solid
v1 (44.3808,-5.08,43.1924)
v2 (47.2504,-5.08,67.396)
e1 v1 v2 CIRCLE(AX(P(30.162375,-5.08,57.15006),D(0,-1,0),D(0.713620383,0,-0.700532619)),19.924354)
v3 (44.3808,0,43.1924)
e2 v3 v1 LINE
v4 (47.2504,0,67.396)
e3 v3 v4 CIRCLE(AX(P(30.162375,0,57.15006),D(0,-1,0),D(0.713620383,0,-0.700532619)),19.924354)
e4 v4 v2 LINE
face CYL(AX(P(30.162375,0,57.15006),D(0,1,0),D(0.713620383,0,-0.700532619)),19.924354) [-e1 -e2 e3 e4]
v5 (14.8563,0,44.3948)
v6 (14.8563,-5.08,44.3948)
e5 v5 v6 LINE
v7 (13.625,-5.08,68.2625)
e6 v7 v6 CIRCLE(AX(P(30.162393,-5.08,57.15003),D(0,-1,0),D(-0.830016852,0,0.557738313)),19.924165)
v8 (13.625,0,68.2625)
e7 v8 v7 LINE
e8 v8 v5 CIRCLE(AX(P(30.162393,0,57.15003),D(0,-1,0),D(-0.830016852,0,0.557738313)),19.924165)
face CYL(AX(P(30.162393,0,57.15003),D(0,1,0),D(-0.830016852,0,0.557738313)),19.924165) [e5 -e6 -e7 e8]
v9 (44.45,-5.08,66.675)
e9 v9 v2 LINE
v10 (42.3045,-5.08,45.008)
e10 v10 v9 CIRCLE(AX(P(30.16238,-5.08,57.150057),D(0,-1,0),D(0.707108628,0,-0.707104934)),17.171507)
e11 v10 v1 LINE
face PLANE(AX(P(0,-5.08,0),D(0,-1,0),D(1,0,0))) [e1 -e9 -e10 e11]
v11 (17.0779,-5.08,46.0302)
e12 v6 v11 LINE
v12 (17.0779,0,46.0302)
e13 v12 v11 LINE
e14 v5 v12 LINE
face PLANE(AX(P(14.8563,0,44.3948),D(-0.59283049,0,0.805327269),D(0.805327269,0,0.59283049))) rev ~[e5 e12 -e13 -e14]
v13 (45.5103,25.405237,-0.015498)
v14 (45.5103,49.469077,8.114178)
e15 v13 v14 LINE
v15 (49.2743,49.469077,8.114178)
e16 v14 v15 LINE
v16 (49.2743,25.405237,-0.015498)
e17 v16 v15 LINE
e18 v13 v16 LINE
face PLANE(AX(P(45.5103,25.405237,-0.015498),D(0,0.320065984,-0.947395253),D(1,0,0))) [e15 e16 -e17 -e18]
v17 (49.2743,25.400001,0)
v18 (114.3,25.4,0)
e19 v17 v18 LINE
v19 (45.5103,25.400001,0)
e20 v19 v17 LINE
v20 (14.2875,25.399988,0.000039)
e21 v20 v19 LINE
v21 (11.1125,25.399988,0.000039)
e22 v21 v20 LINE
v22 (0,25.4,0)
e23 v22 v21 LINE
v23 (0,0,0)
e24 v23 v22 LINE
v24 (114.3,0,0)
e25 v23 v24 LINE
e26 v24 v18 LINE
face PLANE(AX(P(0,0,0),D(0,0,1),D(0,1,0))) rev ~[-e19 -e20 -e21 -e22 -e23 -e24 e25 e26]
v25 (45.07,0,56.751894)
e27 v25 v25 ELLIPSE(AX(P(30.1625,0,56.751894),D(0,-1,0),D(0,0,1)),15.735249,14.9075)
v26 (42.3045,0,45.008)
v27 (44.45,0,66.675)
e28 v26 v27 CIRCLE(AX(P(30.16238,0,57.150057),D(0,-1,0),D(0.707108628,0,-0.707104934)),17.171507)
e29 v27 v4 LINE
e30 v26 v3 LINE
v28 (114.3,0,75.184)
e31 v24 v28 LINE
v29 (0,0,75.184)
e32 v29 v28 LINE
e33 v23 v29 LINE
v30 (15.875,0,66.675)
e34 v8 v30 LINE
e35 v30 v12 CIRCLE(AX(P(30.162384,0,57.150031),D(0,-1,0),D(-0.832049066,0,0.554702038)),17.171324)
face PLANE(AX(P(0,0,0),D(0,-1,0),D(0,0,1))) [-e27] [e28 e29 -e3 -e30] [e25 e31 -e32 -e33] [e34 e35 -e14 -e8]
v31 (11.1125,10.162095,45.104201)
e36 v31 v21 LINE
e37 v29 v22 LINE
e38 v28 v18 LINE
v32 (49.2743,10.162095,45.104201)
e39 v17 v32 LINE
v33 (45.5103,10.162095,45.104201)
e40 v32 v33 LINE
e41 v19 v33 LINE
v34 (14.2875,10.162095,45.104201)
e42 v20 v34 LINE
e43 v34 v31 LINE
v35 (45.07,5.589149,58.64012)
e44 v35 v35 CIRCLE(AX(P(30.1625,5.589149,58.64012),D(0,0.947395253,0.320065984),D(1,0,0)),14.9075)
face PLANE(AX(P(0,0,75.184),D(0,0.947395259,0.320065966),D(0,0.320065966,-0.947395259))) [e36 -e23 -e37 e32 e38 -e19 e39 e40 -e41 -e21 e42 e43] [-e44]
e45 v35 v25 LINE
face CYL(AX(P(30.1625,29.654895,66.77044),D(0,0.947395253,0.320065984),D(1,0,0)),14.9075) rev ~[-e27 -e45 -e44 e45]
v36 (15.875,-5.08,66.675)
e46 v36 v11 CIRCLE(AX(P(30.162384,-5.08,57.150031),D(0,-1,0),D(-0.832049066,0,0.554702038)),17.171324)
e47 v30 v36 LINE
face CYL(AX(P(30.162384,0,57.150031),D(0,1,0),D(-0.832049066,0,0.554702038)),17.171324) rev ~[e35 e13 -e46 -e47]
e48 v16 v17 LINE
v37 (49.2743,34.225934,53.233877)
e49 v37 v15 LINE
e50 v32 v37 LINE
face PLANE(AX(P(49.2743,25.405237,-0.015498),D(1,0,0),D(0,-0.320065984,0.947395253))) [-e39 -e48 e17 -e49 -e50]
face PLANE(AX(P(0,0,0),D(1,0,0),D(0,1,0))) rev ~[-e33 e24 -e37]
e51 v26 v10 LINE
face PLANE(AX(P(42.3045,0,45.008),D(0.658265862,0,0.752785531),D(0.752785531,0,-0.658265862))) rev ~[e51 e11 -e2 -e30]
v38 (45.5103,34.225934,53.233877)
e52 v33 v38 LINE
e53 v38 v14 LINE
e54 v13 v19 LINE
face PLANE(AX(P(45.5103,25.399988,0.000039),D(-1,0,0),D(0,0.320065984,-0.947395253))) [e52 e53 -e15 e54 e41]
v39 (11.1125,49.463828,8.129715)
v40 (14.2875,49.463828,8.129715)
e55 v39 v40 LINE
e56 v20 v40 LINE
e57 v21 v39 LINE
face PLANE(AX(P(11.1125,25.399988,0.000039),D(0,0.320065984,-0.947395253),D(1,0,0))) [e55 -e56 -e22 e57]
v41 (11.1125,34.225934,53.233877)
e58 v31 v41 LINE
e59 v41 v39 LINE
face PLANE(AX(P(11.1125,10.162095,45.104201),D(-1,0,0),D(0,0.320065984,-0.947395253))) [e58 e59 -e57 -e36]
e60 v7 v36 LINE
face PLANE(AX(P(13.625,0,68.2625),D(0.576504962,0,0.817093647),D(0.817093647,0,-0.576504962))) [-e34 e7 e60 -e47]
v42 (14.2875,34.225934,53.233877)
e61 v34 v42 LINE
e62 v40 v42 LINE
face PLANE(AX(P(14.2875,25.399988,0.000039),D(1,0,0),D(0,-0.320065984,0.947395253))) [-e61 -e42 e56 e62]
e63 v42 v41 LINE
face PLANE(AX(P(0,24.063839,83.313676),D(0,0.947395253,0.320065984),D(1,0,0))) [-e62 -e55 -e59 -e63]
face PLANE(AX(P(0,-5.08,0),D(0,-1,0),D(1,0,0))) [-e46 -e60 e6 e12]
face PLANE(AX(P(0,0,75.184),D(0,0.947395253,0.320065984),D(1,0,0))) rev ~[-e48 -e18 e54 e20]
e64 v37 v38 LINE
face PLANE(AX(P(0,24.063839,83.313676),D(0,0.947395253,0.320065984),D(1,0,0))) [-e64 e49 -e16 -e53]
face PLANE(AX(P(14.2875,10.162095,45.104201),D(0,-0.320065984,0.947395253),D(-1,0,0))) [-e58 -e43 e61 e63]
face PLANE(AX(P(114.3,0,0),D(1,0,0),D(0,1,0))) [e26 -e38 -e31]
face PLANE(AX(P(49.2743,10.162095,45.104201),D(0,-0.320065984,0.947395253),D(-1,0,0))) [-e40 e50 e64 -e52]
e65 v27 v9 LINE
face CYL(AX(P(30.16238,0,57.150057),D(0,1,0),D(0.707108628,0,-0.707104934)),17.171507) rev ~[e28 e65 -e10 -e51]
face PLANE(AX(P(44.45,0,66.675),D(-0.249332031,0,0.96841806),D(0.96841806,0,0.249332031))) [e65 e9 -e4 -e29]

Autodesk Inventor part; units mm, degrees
ref_plane "YZ Plane" through (0, 0, 0) normal (1, 0, 0) x (0, 1, 0)
ref_plane "XZ Plane" through (0, 0, 0) normal (0, 1, 0) x (-1, 0, 0)
ref_plane "XY Plane" through (0, 0, 0) normal (0, 0, 1) x (1, 0, 0)
sketch "Sketch1" plane through (0, 0, 0) normal (1, 0, 0) x (0, 1, 0)
  line L0 (0, 0) -> (25.4, 0)
  line L1 (0, 0) -> (0, 75.184)
  line L2 (0, 75.184) -> (25.4, 0)
  dimension "d0" = 25.4
  dimension "d1" = 75.184
extrude "Extrusion1" add sketch "Sketch1" along normal blind 114.3
sketch "Sketch2" plane through (0, 0, 75.184) normal (0, 0.9473953, 0.320066) x (1, 0, 0)
  circle A0 centre (30.1625, 17.4625) radius 13.4874
  point P0 (0, 71.229)
  dimension "d4" = 26.9748
extrude "Extrusion2" add sketch "Sketch2" along normal blind 25.4
sketch "Sketch3" plane through (30.1625, 29.653, 66.7698) normal (0, 0.9473953, 0.320066) x (1, 0, 0)
  circle A0 centre (0, 0) radius 14.9075
  point P0 (-30.1625, 53.7665)
extrude "Extrusion3" cut sketch "Sketch3" against normal blind 76.2
sketch "Sketch4" plane through (0, 0, 0) normal (0, -1, 0) x (1, 0, 0)
  point P0 (0, 0)
sketch "Sketch5" plane through (0, 0, 0) normal (0, -1, 0) x (1, 0, 0)
  arc A0 (42.3045, 45.008) -> (44.45, 66.675) centre (30.1625, 57.15) ccw
  arc A1 (44.3808, 43.1924) -> (47.2504, 67.396) centre (30.1625, 57.15) ccw
  arc A2 (15.875, 66.675) -> (17.0779, 46.0302) centre (30.1625, 57.15) ccw
  arc A3 (13.625, 68.2625) -> (14.8563, 44.3948) centre (30.1625, 57.15) ccw
  line L0 (13.625, 68.2625) -> (15.875, 66.675)
  line L1 (14.8563, 44.3948) -> (17.0779, 46.0302)
  line L2 (44.45, 66.675) -> (47.2504, 67.396)
  line L3 (42.3045, 45.008) -> (44.3808, 43.1924)
  point P0 (0, 0)
extrude "Extrusion4" add sketch "Sketch5" along normal blind 5.08
sketch "Sketch6" plane through (0, 0, 75.184) normal (0, 0.9473953, 0.320066) x (1, 0, 0)
  line L0 (0, 79.3586) -> (114.3, 79.3586) projected
  line L1 (14.2875, 31.75) -> (11.1125, 31.75)
  line L2 (11.1125, 31.75) -> (11.1125, 79.3586)
  line L3 (11.1125, 79.3586) -> (14.2875, 79.3586)
  line L4 (14.2875, 79.3586) -> (14.2875, 31.75)
  line L5 (49.2743, 31.75) -> (45.5103, 31.75)
  line L6 (45.5103, 31.75) -> (45.5103, 79.375)
  line L7 (45.5103, 79.375) -> (49.2743, 79.375)
  line L8 (49.2743, 79.375) -> (49.2743, 31.75)
  point P0 (0, 71.229)
extrude "Extrusion5" add sketch "Sketch6" along normal blind 25.4
properties part number "CAP PROCESS SKETCH"
